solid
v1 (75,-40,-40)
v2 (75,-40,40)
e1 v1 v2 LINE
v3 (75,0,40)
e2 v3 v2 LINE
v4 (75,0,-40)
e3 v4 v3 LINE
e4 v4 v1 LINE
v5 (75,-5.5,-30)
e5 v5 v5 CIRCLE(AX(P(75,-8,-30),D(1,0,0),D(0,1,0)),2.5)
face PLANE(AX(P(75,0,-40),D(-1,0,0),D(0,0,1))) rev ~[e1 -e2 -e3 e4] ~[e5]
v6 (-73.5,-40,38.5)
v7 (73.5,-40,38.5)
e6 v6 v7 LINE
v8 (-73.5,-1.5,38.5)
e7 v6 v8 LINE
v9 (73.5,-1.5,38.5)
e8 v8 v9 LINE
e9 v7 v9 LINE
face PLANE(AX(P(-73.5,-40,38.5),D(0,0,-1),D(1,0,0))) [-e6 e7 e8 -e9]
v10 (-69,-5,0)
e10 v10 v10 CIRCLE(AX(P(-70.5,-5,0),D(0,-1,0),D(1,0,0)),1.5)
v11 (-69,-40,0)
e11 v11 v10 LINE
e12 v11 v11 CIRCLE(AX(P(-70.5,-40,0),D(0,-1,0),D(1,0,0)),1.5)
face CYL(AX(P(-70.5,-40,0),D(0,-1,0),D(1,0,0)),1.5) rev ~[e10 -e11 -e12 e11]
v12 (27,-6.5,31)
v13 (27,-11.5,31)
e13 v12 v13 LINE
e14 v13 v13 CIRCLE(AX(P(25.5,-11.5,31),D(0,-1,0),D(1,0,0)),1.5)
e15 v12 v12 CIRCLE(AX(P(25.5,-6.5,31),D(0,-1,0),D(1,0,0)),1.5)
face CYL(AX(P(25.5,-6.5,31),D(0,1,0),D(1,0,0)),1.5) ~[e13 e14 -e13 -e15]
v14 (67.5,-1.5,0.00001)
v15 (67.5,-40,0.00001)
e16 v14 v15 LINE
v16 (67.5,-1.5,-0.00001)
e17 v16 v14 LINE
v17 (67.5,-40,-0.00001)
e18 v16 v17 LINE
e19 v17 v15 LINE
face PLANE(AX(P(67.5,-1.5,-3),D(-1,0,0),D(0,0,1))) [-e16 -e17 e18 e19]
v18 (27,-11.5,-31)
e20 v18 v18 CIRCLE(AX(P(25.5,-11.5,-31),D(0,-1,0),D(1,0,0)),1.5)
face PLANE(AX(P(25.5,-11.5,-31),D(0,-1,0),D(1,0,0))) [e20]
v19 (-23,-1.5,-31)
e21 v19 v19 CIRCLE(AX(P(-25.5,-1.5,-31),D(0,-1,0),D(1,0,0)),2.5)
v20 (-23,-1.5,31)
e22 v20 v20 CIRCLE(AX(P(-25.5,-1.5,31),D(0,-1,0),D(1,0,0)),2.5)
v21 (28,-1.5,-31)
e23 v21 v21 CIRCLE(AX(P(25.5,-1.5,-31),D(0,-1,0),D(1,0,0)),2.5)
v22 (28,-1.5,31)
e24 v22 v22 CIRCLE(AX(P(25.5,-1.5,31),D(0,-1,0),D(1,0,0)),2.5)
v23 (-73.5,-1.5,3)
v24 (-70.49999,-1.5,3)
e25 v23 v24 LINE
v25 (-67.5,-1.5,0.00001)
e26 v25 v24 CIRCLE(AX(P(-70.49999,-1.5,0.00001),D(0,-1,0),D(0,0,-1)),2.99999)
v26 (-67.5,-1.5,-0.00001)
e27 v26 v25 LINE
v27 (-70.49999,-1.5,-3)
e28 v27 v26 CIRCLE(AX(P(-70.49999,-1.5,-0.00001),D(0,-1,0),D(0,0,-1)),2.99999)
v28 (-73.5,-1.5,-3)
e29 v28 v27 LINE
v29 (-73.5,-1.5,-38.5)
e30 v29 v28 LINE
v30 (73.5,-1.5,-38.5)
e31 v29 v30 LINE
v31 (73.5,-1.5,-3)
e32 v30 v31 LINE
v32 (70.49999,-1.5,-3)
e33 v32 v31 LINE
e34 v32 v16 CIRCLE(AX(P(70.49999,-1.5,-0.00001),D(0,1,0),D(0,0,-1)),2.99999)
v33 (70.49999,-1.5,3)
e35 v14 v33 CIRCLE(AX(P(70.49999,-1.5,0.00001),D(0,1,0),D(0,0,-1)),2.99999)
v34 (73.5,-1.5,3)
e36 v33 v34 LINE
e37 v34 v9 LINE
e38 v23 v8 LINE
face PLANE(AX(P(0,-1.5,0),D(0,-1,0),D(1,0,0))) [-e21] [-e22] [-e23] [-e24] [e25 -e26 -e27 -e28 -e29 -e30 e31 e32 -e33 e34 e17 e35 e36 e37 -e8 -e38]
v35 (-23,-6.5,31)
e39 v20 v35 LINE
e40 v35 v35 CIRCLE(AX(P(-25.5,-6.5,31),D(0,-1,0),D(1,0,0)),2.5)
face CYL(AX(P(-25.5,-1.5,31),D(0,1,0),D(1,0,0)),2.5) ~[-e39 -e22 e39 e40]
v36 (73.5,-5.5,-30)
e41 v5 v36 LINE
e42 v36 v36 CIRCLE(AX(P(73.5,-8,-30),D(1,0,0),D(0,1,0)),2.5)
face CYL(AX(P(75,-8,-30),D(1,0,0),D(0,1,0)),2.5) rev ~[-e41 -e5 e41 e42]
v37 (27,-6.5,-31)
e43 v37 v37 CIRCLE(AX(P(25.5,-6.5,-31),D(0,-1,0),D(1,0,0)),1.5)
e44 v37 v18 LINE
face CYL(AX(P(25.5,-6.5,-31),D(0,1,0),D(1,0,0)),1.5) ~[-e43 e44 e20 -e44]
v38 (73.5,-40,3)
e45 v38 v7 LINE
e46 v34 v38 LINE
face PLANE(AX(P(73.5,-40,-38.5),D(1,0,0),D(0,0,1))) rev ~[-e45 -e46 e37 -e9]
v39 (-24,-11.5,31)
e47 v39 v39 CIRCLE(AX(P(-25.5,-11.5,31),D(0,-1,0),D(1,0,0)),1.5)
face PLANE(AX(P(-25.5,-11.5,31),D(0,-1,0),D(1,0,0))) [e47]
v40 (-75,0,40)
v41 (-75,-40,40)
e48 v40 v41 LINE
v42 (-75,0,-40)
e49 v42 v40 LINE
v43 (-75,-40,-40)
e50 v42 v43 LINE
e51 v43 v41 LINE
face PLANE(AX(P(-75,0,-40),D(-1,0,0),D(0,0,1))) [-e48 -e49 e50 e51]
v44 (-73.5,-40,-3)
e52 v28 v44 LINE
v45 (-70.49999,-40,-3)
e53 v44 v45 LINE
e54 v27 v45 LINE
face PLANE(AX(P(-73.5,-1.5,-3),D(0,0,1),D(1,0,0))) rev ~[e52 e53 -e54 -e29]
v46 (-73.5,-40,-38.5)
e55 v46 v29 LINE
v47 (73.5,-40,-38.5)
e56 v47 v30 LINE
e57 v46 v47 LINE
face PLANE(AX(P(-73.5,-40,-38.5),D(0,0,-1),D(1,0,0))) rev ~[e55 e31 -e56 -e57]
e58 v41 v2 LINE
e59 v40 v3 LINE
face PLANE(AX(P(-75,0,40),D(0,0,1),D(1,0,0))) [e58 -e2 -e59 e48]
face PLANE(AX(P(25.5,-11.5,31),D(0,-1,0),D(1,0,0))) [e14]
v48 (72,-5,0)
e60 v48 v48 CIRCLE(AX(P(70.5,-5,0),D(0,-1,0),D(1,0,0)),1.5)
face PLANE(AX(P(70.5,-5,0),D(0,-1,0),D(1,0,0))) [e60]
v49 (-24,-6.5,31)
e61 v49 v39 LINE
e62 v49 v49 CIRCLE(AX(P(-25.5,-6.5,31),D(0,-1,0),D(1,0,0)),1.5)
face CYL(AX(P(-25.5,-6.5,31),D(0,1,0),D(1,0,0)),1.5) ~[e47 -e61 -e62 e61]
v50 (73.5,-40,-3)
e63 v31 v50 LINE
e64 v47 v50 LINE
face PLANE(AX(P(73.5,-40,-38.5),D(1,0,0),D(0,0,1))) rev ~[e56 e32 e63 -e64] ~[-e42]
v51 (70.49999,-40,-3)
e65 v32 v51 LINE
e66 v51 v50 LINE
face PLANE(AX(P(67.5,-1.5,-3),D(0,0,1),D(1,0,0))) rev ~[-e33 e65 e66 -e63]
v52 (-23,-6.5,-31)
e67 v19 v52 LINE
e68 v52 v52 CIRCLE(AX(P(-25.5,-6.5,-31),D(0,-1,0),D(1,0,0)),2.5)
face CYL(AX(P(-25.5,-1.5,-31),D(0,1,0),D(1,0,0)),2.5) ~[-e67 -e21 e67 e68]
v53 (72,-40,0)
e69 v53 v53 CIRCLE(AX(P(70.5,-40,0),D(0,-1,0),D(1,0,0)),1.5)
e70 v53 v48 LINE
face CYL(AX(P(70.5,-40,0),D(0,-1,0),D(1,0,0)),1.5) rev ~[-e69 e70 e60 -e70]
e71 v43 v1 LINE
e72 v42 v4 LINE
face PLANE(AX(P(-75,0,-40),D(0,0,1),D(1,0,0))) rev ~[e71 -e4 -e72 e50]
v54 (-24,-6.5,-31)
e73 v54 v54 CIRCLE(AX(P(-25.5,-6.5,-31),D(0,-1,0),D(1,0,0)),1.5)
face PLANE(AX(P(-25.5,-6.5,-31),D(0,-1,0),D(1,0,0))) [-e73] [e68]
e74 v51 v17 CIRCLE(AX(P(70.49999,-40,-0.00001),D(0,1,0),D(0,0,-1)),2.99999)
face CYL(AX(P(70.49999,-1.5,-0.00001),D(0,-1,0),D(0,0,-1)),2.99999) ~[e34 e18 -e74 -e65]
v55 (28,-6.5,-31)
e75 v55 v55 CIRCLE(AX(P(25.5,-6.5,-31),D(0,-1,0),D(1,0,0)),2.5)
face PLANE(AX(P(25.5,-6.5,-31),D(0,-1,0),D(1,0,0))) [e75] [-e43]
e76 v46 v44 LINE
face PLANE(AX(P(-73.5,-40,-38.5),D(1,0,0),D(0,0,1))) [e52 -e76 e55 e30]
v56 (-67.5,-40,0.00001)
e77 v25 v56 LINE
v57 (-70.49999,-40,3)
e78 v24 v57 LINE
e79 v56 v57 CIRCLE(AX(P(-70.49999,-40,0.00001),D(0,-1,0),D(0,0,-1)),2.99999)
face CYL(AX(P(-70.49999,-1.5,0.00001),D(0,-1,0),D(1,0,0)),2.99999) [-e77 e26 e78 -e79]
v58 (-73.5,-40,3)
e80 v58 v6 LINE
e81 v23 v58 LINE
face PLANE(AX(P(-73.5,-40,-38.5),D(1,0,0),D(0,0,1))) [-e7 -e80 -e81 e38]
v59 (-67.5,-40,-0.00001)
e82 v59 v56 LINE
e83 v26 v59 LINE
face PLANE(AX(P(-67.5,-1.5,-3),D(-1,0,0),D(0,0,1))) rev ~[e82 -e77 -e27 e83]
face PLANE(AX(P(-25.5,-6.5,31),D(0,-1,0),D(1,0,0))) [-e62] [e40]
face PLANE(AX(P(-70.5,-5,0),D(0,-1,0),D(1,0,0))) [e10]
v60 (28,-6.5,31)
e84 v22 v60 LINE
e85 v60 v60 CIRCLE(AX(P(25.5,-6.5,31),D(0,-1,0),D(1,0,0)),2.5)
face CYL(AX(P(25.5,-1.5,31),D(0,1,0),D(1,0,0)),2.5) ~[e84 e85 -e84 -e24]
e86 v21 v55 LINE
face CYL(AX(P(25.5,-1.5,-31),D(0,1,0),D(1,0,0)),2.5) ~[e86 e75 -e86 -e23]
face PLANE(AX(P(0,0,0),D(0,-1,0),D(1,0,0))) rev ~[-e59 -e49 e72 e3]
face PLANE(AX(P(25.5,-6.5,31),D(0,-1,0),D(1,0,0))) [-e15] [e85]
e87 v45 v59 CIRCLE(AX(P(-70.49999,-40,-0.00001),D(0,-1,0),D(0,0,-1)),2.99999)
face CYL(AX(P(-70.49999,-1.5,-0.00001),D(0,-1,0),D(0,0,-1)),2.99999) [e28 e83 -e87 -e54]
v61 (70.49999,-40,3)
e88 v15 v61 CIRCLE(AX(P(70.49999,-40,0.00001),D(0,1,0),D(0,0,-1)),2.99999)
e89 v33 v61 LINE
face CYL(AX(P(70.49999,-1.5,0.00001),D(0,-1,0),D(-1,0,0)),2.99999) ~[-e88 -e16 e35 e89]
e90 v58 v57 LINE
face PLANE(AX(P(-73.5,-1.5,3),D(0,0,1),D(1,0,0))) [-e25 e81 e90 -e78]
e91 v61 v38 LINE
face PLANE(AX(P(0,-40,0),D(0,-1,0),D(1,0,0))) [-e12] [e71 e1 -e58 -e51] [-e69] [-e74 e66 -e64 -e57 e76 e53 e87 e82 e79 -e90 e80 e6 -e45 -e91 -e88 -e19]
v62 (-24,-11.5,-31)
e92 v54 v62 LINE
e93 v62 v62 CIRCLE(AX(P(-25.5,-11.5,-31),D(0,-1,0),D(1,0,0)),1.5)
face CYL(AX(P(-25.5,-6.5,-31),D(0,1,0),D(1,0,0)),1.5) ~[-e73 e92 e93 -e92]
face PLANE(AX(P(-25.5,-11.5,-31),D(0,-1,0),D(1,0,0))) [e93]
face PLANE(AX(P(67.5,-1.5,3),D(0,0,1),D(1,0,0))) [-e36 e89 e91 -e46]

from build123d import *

# Parameters (mm, degrees)
F0_W      = 150
F0_H      = 80
F1_DEPTH  = 40
F2_W      = 147
F2_H      = 77
F3_DEPTH  = 38.5
F4_R      = 2.5
F5_DEPTH  = 5
F6_R      = 1.5
F7_R      = 1.5
F8_R      = 1.5
F9_R      = 1.5
F10_DEPTH = 5
F11_R     = 2.5
F12_DEPTH = 3
F13_W     = 6
F13_H     = 6
F14_DEPTH = 38.5
F15_R     = 1.5
F16_DEPTH = 35
F17_R     = 2.99999


# Not quite as in the source:
# - a fillet or chamfer is up to 0.001 mm smaller than in the source, because OpenCascade refuses the exact size


with BuildPart() as f1:
    # F0 (on Front) → F1 (new body)
    with BuildSketch(Plane.XZ):
        Rectangle(F0_W, F0_H)
    extrude(amount=F1_DEPTH)

    # F2 (on face) → F3 (cut)
    with BuildSketch(Plane.XZ.offset(40)):
        Rectangle(F2_W, F2_H)
    extrude(amount=-F3_DEPTH, mode=Mode.SUBTRACT)

    # F4 (on face) → F5 (join)
    with BuildSketch(Plane.XZ.offset(1.5)):
        with Locations((-25.5, 31)):
            Circle(F4_R)
        with Locations((-25.5, -31)):
            Circle(F4_R)
        with Locations((25.5, 31)):
            Circle(F4_R)
        with Locations((25.5, -31)):
            Circle(F4_R)
    extrude(amount=F5_DEPTH)

    # F6 (on face) + F7 (on face) + F8 (on face) + F9 (on face) → F10 (join)
    with BuildSketch(Plane.XZ.offset(6.5)):
        with Locations((-25.5, 31)):
            Circle(F6_R)
    with BuildSketch(Plane.XZ.offset(6.5)):
        with Locations((25.5, 31)):
            Circle(F7_R)
    with BuildSketch(Plane.XZ.offset(6.5)):
        with Locations((-25.5, -31)):
            Circle(F8_R)
    with BuildSketch(Plane.XZ.offset(6.5)):
        with Locations((25.5, -31)):
            Circle(F9_R)
    extrude(amount=F10_DEPTH)

    # F11 (on face) → F12 (cut)
    with BuildSketch(Plane.YZ.offset(75)):
        with Locations((-8, -30)):
            Circle(F11_R)
    extrude(amount=-F12_DEPTH, mode=Mode.SUBTRACT)

    # F13 (on face) → F14 (join)
    with BuildSketch(Plane.XZ.offset(1.5)):
        with Locations((-70.5, 0)):
            Rectangle(F13_W, F13_H)
        with Locations((70.5, 0)):
            Rectangle(F13_W, F13_H)
    extrude(amount=F14_DEPTH)

    # F15 (on face) → F16 (cut)
    with BuildSketch(Plane.XZ.offset(40)):
        with Locations((-70.5, 0)):
            Circle(F15_R)
        with Locations((70.5, 0)):
            Circle(F15_R)
    extrude(amount=-F16_DEPTH, mode=Mode.SUBTRACT)

    # F17 (radius 3 in the source; OpenCascade refuses exactly that, so slightly less here)
    f17_edges = [f1.edges().sort_by_distance(p)[0] for p in [
        (-67.5, -20.75, 3),
        (-67.5, -20.75, -3),
        (67.5, -20.75, -3),
        (67.5, -20.75, 3),
    ]]
    fillet(f17_edges, radius=F17_R)


solid = f1.part
